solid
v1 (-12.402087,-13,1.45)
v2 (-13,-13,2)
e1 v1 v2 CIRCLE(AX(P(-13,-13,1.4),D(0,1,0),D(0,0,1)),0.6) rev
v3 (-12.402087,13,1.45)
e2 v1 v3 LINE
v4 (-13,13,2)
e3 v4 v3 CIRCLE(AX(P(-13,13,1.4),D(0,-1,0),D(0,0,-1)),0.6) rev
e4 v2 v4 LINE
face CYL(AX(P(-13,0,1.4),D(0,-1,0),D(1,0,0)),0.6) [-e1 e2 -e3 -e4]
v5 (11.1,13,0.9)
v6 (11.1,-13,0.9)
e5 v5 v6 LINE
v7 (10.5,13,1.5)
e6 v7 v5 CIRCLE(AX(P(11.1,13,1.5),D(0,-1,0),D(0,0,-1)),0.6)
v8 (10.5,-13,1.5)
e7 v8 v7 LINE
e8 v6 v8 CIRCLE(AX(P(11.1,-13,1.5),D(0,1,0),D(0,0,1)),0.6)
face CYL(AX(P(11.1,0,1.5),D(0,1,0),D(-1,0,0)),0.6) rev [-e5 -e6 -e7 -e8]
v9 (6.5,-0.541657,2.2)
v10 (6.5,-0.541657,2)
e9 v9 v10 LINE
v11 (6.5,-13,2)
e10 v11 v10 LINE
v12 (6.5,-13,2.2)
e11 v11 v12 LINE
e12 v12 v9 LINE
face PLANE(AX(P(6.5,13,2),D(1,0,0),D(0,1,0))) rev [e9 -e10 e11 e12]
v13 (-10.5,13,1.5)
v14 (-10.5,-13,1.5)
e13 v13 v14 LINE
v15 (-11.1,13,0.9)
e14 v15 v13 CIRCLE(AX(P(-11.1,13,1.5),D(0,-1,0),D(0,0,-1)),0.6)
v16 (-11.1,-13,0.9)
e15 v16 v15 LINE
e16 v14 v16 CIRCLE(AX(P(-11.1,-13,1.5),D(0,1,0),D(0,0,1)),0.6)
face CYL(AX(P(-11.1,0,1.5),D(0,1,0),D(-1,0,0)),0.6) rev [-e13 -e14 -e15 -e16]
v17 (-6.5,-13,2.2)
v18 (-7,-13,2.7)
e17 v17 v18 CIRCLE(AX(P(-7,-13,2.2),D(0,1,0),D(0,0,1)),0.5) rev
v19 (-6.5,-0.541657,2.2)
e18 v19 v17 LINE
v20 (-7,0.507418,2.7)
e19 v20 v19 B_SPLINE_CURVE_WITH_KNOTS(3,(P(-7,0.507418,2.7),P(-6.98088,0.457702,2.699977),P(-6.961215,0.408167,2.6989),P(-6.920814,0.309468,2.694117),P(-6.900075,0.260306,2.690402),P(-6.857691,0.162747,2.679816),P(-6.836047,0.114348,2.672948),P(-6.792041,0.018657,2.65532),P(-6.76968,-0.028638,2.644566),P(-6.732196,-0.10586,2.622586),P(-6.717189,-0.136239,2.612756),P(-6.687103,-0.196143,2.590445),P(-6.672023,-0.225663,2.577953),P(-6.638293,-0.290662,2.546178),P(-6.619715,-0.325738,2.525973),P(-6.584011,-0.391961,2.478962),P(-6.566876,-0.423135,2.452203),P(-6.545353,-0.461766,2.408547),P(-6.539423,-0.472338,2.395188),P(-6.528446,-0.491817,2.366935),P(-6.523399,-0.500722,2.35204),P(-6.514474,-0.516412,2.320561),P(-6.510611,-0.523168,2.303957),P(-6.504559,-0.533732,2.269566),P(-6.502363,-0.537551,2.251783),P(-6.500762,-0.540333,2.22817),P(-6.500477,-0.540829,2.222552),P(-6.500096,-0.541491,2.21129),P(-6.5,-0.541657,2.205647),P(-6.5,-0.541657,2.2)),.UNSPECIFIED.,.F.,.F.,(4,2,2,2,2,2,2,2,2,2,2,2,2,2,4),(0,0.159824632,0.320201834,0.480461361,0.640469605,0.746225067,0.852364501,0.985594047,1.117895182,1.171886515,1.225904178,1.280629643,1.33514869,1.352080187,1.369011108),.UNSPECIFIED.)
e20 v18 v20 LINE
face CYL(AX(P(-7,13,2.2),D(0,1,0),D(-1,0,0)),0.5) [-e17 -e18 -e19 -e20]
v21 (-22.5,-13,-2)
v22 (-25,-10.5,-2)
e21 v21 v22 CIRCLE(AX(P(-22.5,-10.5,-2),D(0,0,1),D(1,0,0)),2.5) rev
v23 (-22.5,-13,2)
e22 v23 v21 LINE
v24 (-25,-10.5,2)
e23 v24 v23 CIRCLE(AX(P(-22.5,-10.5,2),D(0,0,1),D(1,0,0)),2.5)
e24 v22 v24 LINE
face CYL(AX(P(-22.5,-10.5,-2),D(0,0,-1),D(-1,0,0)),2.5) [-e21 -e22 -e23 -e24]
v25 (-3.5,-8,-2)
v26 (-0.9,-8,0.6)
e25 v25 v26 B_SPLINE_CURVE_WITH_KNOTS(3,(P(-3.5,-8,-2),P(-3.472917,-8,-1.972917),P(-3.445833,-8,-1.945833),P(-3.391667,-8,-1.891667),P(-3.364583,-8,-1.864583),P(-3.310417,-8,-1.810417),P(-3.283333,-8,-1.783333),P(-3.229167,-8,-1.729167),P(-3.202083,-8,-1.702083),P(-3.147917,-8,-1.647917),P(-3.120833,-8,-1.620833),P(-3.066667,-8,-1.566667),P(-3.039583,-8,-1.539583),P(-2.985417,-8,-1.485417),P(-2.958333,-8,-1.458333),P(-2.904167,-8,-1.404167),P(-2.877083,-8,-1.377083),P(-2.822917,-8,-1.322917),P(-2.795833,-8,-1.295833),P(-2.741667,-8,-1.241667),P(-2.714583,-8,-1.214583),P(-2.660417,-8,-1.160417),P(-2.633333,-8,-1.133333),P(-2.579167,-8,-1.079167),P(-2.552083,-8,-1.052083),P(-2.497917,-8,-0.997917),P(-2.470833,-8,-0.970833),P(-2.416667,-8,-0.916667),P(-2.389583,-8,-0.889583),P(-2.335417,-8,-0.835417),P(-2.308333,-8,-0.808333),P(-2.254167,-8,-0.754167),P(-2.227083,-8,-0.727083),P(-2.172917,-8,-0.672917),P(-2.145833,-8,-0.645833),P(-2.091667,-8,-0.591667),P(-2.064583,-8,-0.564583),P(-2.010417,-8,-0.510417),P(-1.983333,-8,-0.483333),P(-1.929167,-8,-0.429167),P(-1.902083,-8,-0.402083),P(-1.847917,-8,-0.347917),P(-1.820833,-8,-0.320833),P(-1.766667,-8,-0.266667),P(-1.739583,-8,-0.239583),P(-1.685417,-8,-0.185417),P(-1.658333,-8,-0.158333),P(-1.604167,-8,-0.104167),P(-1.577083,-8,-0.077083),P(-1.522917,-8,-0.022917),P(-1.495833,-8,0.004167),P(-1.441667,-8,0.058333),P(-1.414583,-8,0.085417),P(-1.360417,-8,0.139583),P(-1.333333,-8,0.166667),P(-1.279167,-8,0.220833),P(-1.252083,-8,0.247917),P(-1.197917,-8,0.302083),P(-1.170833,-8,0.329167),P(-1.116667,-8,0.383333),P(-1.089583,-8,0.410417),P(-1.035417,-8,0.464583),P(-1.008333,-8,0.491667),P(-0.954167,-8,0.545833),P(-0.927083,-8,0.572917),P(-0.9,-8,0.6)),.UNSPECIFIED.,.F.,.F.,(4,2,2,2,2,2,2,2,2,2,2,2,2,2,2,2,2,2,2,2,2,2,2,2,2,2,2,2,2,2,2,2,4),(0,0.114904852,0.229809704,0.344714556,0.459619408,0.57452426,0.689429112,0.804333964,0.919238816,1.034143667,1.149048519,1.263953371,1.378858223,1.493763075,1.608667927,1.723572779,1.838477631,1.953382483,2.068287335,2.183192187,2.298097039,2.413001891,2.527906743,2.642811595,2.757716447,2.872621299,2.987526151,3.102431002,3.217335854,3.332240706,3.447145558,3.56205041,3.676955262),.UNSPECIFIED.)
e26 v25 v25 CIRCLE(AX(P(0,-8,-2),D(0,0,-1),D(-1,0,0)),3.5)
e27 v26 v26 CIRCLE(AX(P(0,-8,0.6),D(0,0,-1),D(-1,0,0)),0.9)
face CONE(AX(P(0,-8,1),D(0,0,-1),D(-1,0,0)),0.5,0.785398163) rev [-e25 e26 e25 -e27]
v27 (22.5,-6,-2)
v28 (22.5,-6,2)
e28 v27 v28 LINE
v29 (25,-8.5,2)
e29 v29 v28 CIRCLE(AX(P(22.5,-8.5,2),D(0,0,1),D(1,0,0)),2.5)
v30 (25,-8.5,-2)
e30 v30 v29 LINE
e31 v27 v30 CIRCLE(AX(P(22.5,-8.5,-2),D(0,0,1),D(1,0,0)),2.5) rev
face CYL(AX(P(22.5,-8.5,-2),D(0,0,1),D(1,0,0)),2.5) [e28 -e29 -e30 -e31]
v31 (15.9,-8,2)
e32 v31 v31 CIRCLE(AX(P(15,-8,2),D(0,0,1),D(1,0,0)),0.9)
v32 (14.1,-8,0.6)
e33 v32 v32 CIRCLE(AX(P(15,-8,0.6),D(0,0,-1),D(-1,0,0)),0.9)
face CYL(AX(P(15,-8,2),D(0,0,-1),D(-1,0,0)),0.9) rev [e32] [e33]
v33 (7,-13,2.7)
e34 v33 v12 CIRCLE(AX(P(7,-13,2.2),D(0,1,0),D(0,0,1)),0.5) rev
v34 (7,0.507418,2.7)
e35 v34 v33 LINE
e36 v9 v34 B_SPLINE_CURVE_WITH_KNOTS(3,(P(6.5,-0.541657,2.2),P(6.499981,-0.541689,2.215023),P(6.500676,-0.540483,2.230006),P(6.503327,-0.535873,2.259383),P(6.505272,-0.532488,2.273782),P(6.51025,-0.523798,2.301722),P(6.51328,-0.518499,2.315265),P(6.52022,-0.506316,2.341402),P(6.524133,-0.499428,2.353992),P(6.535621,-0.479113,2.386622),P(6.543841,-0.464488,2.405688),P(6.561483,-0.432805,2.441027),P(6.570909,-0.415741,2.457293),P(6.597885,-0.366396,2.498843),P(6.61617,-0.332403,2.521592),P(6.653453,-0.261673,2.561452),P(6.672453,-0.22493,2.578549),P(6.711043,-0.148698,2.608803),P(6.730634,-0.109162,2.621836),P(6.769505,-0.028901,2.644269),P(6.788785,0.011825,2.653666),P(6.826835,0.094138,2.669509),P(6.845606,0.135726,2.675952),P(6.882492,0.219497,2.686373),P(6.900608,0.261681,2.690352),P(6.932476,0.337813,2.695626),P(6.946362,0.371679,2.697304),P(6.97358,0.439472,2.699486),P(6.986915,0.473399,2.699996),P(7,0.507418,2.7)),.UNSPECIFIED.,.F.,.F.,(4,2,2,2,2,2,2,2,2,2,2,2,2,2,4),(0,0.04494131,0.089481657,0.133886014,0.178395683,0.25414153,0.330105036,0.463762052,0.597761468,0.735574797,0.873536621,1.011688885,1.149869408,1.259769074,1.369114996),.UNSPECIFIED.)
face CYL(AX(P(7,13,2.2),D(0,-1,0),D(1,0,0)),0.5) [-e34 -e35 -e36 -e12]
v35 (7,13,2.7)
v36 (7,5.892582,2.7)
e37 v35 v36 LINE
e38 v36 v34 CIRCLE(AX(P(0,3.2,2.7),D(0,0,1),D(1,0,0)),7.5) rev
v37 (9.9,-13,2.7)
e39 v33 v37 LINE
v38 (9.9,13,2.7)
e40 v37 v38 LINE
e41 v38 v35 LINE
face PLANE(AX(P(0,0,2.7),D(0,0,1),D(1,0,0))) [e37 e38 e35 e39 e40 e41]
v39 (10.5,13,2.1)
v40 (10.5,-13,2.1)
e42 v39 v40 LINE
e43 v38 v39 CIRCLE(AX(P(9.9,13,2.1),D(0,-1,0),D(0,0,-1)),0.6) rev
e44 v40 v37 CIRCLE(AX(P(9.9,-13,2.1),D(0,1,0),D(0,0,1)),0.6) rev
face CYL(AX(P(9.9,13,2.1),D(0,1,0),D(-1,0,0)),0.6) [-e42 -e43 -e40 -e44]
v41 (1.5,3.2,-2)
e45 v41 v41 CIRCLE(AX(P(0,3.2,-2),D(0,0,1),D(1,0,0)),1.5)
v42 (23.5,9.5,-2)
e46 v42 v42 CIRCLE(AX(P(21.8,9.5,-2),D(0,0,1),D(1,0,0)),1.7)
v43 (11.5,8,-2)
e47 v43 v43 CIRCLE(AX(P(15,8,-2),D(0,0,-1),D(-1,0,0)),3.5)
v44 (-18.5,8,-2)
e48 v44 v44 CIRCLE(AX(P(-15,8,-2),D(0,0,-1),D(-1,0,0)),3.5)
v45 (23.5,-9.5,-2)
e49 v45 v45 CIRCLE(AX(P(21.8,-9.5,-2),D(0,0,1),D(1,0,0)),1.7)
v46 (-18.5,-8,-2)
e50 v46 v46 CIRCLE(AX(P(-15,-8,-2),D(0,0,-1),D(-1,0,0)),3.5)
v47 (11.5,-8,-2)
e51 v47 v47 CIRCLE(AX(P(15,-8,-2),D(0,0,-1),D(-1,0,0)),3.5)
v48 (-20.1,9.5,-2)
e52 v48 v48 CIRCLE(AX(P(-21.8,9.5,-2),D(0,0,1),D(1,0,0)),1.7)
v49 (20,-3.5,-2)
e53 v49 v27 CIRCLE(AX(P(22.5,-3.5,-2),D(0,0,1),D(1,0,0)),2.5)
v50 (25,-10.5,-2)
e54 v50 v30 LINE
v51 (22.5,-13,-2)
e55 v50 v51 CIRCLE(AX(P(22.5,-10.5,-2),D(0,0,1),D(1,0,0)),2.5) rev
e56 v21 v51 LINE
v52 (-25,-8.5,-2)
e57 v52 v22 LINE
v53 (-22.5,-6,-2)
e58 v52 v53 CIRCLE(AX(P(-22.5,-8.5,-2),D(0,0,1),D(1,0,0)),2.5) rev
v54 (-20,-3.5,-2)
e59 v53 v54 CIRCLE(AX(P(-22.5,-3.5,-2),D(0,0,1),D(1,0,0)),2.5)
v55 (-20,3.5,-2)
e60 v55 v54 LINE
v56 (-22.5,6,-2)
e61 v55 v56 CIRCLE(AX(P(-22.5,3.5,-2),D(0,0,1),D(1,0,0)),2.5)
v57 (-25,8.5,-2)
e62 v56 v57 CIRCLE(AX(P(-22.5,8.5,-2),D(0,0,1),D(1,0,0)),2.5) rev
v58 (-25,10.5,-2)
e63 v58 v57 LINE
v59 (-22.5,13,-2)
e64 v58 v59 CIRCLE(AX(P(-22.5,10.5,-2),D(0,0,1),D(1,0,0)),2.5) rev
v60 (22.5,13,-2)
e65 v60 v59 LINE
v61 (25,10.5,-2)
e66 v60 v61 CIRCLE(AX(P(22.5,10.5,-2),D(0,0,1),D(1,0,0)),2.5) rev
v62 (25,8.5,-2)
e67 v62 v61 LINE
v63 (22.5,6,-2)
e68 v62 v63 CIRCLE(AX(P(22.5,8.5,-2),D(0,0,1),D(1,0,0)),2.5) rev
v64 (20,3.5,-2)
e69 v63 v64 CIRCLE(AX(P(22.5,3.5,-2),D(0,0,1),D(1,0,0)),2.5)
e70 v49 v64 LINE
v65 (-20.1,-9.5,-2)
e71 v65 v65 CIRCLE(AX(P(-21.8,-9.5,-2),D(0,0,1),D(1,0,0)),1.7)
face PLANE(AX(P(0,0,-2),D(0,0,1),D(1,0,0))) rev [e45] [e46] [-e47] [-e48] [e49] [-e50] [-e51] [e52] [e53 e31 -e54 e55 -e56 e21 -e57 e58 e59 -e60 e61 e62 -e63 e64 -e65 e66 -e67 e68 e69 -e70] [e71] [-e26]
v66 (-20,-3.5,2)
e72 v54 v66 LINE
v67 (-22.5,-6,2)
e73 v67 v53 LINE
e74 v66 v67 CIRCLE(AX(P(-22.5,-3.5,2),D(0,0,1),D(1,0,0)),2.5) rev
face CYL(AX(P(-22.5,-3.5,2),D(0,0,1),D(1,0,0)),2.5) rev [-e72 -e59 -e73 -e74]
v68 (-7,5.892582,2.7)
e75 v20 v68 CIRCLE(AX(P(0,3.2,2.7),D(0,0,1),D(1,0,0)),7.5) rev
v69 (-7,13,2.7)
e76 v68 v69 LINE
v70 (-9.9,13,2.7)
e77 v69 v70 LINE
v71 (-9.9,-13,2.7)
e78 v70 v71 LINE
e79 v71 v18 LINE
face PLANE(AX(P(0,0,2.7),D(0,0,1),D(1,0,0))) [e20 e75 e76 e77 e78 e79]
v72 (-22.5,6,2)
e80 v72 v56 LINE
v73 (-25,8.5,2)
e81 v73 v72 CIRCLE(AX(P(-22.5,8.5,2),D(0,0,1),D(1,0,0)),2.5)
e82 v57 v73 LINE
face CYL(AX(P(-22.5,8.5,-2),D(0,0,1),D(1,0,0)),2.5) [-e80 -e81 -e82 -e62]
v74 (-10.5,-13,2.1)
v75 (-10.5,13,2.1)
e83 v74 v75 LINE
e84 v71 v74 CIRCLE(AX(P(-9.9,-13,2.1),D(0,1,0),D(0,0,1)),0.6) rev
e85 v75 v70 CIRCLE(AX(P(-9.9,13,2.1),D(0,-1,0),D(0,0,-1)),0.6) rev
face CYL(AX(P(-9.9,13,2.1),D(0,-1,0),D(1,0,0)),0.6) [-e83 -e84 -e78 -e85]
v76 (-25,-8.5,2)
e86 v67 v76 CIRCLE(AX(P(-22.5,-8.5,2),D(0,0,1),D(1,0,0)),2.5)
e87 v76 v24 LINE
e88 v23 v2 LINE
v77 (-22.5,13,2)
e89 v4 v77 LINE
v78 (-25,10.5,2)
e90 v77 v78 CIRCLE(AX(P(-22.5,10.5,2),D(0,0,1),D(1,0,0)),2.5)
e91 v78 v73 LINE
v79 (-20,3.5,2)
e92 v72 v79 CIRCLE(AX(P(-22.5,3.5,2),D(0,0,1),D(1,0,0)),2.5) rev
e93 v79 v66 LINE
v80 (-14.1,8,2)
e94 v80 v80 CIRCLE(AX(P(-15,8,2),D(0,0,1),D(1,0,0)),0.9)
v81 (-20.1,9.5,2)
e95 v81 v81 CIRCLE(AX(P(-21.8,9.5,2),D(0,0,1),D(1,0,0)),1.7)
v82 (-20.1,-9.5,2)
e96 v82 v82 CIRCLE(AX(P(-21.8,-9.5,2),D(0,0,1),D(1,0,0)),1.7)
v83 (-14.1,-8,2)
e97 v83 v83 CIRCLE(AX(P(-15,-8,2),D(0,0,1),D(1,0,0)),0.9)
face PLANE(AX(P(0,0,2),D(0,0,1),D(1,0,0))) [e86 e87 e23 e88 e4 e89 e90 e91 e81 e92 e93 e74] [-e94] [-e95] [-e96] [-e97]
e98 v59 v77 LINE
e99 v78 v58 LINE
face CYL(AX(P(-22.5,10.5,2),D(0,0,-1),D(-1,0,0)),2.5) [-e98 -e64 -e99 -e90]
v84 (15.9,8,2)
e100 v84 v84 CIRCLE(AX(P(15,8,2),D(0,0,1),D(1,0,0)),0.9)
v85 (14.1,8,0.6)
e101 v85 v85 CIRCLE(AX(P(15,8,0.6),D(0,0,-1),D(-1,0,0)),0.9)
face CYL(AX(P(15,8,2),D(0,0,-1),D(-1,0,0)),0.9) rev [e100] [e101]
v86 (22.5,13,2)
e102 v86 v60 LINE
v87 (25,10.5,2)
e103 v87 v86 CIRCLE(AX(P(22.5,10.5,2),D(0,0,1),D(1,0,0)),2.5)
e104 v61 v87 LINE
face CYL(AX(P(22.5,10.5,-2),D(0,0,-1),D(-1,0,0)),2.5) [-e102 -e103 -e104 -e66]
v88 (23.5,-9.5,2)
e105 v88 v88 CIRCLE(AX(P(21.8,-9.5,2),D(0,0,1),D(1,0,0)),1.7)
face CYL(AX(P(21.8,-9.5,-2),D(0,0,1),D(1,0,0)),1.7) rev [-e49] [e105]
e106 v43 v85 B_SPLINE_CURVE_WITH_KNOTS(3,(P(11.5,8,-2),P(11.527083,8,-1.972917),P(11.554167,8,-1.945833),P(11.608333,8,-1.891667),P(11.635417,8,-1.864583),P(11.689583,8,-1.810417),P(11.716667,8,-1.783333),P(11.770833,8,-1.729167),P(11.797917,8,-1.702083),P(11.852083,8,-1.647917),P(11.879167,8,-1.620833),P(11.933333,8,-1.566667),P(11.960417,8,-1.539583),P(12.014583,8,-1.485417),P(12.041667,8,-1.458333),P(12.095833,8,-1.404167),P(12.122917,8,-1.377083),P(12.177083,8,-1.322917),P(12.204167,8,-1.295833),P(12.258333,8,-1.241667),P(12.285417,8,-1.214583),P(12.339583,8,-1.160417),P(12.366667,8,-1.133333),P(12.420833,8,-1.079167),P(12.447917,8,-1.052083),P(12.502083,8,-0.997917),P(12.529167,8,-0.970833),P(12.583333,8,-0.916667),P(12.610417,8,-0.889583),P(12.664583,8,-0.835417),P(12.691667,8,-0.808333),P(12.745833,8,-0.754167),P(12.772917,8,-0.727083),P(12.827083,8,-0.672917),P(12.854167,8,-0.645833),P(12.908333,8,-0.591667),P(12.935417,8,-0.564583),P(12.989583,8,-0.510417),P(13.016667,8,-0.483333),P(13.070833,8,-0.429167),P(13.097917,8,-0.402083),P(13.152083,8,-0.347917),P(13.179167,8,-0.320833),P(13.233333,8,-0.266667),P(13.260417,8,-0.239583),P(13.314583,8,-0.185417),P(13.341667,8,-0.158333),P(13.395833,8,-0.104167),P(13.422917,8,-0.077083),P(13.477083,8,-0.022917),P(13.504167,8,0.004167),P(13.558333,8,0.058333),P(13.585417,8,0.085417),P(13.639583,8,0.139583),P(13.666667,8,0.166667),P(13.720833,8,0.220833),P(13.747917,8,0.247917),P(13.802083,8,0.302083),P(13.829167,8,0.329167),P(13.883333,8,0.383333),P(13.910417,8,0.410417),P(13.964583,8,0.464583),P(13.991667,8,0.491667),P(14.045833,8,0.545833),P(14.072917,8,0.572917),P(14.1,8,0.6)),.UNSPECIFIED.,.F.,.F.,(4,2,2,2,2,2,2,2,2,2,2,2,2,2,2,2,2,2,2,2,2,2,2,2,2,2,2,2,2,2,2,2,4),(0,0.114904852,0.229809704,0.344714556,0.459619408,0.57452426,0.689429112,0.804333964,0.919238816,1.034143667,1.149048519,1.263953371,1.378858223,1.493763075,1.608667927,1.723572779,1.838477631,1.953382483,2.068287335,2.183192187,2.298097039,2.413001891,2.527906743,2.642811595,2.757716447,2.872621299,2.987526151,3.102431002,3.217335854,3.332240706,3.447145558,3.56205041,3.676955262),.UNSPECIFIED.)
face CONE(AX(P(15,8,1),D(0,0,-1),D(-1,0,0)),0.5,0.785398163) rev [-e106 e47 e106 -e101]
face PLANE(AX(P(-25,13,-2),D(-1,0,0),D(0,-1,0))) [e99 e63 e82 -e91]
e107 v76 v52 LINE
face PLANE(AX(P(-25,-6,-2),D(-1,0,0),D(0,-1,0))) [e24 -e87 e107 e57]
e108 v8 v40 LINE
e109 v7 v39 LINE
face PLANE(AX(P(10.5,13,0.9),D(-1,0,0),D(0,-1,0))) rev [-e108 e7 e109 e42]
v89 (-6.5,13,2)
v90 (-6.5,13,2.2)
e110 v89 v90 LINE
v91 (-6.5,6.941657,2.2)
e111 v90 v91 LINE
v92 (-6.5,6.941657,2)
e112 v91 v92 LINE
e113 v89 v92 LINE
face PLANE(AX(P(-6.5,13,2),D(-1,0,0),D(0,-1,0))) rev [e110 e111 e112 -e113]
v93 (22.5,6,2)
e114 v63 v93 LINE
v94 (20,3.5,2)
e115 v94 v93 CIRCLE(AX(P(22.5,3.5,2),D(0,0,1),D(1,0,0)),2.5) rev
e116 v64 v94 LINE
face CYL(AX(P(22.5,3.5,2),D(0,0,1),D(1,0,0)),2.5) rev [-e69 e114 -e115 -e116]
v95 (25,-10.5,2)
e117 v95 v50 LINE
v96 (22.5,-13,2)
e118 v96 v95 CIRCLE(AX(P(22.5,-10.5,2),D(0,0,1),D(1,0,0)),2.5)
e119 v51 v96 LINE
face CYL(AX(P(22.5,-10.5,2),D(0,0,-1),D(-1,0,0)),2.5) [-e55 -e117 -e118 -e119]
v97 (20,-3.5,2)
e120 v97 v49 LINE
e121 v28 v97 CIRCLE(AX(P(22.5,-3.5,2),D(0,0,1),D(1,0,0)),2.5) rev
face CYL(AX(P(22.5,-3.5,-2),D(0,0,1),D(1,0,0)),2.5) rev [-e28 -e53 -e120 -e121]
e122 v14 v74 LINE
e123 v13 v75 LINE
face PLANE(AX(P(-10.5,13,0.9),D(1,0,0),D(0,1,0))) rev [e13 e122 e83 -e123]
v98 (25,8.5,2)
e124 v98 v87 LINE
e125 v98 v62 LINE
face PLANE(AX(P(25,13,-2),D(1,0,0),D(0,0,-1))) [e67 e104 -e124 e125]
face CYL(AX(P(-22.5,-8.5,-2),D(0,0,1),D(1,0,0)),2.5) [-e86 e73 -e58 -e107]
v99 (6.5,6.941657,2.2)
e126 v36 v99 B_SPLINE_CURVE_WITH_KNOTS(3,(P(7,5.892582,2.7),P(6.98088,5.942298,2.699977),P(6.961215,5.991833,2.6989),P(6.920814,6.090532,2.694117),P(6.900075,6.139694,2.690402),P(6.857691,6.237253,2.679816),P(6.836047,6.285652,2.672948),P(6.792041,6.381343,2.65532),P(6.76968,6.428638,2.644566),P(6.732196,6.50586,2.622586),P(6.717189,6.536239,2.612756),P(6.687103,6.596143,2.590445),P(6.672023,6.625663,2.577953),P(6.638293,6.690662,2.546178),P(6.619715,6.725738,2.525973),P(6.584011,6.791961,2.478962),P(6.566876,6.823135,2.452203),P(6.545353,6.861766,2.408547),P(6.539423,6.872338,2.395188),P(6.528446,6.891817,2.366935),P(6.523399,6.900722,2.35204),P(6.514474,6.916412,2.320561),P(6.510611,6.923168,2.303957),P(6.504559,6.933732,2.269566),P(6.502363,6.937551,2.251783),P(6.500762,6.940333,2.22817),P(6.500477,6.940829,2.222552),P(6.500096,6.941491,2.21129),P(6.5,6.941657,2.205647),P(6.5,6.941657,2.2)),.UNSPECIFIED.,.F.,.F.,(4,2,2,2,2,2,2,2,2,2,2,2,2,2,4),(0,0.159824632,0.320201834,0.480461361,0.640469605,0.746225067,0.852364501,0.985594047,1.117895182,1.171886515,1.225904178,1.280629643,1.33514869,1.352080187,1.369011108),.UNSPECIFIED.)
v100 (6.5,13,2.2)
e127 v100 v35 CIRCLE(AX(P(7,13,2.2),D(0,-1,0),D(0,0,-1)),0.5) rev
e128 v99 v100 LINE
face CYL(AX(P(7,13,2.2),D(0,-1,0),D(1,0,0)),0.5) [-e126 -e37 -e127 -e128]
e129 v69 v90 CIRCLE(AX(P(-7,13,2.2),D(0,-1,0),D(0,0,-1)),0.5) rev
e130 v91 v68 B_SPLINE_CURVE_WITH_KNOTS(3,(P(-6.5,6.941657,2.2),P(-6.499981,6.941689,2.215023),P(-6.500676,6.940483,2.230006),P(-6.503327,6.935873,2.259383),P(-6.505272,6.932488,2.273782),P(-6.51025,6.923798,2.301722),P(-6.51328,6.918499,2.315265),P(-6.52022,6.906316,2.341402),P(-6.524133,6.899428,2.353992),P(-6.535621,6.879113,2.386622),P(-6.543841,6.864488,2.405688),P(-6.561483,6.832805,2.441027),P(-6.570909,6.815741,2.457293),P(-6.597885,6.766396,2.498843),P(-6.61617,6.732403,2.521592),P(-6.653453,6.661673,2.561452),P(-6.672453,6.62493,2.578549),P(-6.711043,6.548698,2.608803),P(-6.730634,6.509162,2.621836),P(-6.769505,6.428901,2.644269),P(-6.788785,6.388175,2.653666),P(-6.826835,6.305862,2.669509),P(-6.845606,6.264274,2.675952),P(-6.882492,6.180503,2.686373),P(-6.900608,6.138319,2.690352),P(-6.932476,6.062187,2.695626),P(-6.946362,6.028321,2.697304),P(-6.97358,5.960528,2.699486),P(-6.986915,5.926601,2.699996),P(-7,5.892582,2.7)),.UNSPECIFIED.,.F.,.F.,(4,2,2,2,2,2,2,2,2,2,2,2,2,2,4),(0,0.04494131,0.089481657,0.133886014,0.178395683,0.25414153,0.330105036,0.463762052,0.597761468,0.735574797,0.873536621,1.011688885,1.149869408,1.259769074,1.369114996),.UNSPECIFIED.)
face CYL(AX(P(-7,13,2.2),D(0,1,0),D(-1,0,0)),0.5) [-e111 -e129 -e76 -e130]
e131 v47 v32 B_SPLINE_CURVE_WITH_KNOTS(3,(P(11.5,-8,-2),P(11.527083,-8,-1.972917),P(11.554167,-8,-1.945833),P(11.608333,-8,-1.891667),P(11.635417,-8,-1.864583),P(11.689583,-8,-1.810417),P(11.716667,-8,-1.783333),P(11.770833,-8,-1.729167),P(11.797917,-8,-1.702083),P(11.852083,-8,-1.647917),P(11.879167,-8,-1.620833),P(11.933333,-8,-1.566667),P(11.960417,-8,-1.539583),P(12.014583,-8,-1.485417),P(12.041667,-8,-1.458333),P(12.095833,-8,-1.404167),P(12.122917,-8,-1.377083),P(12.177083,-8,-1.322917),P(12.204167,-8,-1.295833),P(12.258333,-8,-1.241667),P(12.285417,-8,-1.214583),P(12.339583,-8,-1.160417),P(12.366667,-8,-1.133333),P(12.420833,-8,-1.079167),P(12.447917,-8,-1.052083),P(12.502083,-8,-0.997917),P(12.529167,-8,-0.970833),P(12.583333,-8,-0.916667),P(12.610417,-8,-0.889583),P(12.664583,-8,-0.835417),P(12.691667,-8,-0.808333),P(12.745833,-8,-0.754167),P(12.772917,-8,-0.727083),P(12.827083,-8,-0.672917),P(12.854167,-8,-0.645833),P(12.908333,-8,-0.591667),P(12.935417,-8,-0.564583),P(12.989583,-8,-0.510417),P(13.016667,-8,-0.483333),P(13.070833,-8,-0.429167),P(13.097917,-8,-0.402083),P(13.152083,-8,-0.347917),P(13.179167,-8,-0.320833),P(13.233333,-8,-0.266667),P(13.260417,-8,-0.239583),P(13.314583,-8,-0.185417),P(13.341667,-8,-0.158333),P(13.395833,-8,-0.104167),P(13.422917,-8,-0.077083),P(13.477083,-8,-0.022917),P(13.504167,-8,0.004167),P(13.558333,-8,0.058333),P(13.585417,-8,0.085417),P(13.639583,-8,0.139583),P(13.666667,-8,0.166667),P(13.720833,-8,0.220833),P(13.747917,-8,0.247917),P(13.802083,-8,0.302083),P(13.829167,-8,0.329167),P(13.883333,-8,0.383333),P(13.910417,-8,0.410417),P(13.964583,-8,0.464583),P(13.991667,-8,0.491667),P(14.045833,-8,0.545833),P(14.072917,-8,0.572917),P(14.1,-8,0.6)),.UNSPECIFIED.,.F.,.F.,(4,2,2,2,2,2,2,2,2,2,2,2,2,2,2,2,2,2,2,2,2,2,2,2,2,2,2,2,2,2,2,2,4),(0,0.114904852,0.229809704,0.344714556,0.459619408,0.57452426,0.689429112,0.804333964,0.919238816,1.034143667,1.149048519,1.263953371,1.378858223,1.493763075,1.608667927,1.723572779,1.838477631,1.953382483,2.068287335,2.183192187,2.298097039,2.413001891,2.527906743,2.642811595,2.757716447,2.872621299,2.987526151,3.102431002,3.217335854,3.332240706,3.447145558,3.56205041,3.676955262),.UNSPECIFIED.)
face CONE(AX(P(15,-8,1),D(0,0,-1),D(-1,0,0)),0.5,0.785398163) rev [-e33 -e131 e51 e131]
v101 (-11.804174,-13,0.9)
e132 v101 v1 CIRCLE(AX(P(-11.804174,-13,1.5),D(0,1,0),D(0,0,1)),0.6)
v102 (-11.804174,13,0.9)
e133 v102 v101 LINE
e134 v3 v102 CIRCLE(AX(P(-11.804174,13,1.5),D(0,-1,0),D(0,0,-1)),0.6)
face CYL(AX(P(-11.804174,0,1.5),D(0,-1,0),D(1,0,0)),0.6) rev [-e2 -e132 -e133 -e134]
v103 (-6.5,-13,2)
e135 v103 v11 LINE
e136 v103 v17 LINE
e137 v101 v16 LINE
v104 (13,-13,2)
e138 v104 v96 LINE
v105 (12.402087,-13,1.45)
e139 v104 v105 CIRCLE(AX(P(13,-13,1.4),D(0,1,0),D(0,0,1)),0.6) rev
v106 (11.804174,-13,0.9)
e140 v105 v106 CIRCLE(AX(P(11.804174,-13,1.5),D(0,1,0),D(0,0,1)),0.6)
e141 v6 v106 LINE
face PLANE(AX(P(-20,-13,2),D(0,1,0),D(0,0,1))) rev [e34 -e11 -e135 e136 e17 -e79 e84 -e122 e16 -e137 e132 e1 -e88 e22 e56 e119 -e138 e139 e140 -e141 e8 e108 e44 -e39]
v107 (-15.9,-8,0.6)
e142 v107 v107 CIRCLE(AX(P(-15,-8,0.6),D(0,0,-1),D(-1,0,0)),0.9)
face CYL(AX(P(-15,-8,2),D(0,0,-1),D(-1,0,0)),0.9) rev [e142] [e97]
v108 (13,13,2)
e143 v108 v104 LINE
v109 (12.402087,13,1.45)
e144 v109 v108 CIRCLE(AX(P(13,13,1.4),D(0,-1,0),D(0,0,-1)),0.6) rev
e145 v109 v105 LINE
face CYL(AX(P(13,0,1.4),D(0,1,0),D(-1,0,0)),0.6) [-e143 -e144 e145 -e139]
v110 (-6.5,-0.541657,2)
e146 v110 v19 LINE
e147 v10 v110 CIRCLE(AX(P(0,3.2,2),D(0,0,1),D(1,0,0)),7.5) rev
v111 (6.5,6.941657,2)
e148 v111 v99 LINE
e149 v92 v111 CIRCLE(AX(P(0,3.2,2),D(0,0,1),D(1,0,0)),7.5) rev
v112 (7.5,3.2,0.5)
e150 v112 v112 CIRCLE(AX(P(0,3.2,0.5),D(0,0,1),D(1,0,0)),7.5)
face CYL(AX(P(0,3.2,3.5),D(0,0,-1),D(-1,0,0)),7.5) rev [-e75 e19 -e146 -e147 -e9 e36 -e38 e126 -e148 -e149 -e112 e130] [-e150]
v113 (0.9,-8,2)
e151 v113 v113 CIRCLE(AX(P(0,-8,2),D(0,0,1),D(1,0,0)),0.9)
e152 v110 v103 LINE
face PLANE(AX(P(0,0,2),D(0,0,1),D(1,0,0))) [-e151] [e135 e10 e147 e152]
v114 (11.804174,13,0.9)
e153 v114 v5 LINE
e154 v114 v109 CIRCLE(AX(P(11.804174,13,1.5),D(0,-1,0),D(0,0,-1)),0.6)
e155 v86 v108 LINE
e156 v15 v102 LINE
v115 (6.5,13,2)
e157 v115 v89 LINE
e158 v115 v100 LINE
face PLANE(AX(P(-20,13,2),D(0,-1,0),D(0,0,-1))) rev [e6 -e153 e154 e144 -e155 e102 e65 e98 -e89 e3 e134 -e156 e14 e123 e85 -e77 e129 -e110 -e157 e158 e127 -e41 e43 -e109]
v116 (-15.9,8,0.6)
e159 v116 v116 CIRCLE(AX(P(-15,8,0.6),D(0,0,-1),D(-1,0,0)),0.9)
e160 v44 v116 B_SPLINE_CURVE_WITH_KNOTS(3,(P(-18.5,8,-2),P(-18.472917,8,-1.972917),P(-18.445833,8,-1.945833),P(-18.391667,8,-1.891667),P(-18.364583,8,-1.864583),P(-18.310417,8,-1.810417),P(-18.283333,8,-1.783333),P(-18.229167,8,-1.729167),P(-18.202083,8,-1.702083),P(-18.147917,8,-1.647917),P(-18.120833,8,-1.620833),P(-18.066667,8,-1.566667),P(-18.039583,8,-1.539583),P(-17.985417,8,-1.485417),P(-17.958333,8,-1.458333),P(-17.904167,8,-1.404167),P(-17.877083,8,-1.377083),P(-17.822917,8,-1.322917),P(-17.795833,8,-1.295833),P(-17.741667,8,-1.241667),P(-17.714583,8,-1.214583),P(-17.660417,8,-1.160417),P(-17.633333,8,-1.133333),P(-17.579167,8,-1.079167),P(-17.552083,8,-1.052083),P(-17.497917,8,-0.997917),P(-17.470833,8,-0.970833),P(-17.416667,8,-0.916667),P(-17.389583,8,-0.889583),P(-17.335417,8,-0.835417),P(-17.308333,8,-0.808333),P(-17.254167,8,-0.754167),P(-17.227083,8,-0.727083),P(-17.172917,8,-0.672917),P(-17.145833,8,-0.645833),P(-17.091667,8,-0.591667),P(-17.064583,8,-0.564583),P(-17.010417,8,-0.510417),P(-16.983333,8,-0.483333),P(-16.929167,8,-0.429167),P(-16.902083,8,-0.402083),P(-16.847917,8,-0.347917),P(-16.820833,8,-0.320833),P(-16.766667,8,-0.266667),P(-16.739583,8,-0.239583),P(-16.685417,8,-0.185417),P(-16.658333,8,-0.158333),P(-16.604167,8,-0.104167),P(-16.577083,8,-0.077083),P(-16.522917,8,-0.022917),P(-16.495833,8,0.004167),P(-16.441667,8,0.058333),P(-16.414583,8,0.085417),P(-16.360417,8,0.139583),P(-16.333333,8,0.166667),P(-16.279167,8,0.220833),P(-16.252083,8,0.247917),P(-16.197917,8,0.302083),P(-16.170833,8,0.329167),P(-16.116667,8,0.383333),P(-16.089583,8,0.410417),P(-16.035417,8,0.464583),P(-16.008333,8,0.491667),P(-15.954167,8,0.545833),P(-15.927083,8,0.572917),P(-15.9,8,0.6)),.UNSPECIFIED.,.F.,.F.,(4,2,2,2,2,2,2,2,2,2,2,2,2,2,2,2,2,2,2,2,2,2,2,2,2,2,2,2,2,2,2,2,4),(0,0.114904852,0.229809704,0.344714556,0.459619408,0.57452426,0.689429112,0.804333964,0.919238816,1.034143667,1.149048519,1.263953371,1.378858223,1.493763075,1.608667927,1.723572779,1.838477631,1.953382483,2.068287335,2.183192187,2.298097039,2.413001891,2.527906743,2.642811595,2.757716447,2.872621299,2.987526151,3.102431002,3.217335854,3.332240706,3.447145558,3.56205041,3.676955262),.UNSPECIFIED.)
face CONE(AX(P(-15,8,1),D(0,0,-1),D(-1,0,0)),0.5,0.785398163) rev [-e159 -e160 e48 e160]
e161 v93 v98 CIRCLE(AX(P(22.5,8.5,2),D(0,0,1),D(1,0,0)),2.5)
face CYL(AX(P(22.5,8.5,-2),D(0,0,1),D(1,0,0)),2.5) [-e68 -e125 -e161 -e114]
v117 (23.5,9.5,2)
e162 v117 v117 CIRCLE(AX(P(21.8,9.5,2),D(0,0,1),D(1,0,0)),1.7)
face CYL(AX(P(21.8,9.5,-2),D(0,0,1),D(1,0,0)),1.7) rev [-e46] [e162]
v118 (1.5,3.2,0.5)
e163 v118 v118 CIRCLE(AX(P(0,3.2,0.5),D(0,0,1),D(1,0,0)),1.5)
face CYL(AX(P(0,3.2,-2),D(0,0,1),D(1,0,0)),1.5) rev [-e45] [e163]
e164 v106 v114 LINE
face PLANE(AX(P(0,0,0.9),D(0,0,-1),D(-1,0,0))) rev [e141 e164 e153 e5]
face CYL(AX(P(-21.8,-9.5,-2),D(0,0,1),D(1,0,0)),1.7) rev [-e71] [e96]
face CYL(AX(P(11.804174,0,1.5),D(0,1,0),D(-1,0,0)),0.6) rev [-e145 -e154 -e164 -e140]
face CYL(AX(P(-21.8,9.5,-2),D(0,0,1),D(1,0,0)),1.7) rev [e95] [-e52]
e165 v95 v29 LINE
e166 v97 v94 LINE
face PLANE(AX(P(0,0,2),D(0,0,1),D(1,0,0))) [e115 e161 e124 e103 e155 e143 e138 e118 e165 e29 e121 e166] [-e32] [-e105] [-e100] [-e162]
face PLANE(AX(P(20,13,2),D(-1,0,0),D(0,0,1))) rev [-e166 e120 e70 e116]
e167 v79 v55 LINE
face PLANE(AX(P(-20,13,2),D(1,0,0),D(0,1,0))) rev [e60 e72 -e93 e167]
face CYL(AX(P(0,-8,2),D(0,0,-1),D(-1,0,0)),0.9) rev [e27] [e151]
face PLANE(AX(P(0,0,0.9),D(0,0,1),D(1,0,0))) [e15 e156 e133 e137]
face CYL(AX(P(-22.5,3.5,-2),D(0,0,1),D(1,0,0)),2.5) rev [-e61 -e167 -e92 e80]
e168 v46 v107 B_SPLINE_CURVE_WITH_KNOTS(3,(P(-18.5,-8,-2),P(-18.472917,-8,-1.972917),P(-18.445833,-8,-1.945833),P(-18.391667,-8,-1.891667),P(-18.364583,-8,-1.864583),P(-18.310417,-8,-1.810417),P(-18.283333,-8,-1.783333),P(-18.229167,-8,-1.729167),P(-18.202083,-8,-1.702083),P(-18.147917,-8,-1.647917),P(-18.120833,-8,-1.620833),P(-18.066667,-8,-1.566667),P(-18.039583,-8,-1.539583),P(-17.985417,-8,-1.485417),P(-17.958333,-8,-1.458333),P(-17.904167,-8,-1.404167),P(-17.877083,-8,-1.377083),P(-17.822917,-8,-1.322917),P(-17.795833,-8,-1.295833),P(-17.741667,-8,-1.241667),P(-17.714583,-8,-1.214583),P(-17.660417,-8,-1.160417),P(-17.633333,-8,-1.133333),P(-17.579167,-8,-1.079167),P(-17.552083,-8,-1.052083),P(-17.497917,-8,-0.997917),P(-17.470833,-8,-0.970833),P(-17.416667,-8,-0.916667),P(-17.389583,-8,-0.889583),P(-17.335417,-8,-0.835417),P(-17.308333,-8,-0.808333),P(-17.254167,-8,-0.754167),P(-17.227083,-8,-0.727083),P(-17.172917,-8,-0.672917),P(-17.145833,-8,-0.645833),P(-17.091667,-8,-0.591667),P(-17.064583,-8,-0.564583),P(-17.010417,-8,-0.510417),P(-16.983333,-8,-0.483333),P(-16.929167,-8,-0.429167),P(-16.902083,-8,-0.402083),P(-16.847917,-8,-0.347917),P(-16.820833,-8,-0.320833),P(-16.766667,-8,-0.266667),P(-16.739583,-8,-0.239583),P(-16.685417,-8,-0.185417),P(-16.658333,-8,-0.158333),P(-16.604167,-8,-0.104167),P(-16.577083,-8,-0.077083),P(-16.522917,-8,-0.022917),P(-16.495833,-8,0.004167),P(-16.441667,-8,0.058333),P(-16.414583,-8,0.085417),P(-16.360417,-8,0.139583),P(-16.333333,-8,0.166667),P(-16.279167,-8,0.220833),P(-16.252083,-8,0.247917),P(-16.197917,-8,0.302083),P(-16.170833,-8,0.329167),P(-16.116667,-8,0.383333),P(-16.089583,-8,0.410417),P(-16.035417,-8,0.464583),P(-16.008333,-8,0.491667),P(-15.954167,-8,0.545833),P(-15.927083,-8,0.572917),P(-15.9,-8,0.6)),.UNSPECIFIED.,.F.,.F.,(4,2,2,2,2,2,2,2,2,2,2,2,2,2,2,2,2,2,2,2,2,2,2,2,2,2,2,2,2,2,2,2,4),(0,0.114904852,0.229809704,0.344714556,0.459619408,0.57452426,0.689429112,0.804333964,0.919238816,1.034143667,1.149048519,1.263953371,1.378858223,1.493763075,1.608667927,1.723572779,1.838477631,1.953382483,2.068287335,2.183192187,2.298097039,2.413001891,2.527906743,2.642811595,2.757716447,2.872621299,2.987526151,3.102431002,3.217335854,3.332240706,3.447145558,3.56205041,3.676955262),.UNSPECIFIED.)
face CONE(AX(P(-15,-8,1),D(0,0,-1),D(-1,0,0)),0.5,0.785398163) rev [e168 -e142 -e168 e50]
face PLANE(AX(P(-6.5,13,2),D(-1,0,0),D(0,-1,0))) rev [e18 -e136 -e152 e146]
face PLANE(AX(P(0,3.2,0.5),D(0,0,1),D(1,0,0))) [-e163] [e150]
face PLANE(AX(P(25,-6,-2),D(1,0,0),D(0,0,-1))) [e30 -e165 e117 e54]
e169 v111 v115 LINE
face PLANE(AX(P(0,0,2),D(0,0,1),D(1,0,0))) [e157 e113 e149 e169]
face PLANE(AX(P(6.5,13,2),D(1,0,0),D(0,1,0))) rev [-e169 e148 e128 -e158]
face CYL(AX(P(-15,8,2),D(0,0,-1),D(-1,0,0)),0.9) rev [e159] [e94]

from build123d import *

# Parameters (mm, degrees)
BODY_S_W                    = 40
BODY_S_H                    = 26
BODY_S_R                    = 0.9
BODY_DEPTH                  = 2
CUTTING_S_R                 = 3.5
CUTTING_DEPTH               = 3
WING_S_W                    = 5
WING_S_H                    = 7
WING_S_R                    = 1.7
WING_DEPTH                  = 4
LINEARES_MUSTER2_COUNT      = 2
LINEARES_MUSTER2_PITCH      = 19
VERRUNDUNG2_R               = 2.5
GLIDES_S_W                  = 9.2
GLIDES_S_H                  = 26
GLIDES_DEPTH                = 0.7
GEAR_H_R                    = 7.5
GEARHOLE_DEPTH              = 1.5
SHAFT_BORE_DEPTH            = 29.460498942
SHAFT_BORE_DEPTH_BACK       = 29.460498942
BORE_S_R                    = 1.5
FASE2_SIZE                  = 3
FASE3_SIZE                  = 3
RAILCUT_W                   = 1.9
RAILCUT_H                   = 26
RAIL_CUT_DEPTH              = 1.8
EDGE_2_W                    = 0.3
EDGE_2_H                    = 26
CUT_EDGE_DEPTH              = 0.7
VERRUNDUNG6_R               = 0.6
VERRUNDUNG7_R               = 0.6
VERRUNDUNG8_R               = 0.6
GLIDE_SPACE_W               = 3
GLIDE_SPACE_H               = 26
GLIDE_SPACE_RACK_SPUR_DEPTH = 0.7
VERRUNDUNG10_R              = 0.5
VERRUNDUNG11_R              = 0.5
VERRUNDUNG12_R              = 0.5


# Some blends are built 0.0001 mm under size
with BuildPart() as part:
    # body-s → body (new, symmetric)
    with BuildSketch(Plane.XY):
        Rectangle(BODY_S_W, BODY_S_H)
        with Locations((-15, 8)):
            Circle(BODY_S_R, mode=Mode.SUBTRACT)
        with Locations((15, 8)):
            Circle(BODY_S_R, mode=Mode.SUBTRACT)
        with Locations((15, -8)):
            Circle(BODY_S_R, mode=Mode.SUBTRACT)
        with Locations((-15, -8)):
            Circle(BODY_S_R, mode=Mode.SUBTRACT)
        with Locations((0, -8)):
            Circle(BODY_S_R, mode=Mode.SUBTRACT)
    extrude(amount=BODY_DEPTH, both=True)

    # cutting-s → cutting (cut)
    with BuildSketch(Plane(origin=(0, 0, -2), x_dir=(-1, 0, 0), z_dir=(0, 0, -1))):
        with Locations((-15, 8)):
            Circle(CUTTING_S_R)
        with Locations((15, 8)):
            Circle(CUTTING_S_R)
        with Locations((15, -8)):
            Circle(CUTTING_S_R)
        with Locations((-15, -8)):
            Circle(CUTTING_S_R)
        with Locations((0, -8)):
            Circle(CUTTING_S_R)
    extrude(amount=-CUTTING_DEPTH, mode=Mode.SUBTRACT)

    # wing-s → wing (add)
    # profile 1 of 2: a face of its own
    with BuildSketch(Plane.XY.offset(2)):
        with Locations((-22.5, 9.5)):
            Rectangle(WING_S_W, WING_S_H)
        with Locations((-21.8, 9.5)):
            Circle(WING_S_R, mode=Mode.SUBTRACT)
    # profile 2 of 2: a face of its own
    with BuildSketch(Plane.XY.offset(2)):
        with Locations((22.5, 9.5)):
            Rectangle(WING_S_W, WING_S_H)
        with Locations((21.8, 9.5)):
            Circle(WING_S_R, mode=Mode.SUBTRACT)
    wing = extrude(amount=-WING_DEPTH)

    # Lineares Muster2: wing ×2
    with Locations(*[(0, -i * LINEARES_MUSTER2_PITCH, 0) for i in range(1, LINEARES_MUSTER2_COUNT)]):
        add(wing)

    # Verrundung2
    verrundung2_edges = [part.edges().sort_by_distance(p)[0] for p in [
        (25, -13, 0),
        (25, -6, 0),
        (-25, -6, 0),
        (-25, -13, 0),
        (-20, -6, 0),
        (-20, 6, 0),
        (-25, 6, 0),
        (-25, 13, 0),
        (25, 13, 0),
        (20, -6, 0),
        (20, 6, 0),
        (25, 6, 0),
    ]]
    fillet(verrundung2_edges, radius=VERRUNDUNG2_R - 0.0001)  # a hair under: the kernel refuses the full size

    # glides-s → glides (add)
    with BuildSketch(Plane.XY.offset(2)):
        with Locations((-8.1, 0)):
            Rectangle(GLIDES_S_W, GLIDES_S_H)
        with Locations((8.1, 0)):
            Rectangle(GLIDES_S_W, GLIDES_S_H)
    extrude(amount=GLIDES_DEPTH)

    # gear-h → gearhole (cut, symmetric)
    with BuildSketch(Plane.XY.offset(2)):
        with Locations(Location((0, 3.2, 0), (0, 0, 117.818139285))):
            Circle(GEAR_H_R)
    extrude(amount=GEARHOLE_DEPTH, both=True, mode=Mode.SUBTRACT)

    # bore-s → Shaft-bore (cut, two sides: drawn at the far end of the back side and taken through both)
    with BuildSketch(Plane.XY.offset(2).offset(-SHAFT_BORE_DEPTH_BACK)):
        with Locations((0, 3.2)):
            Circle(BORE_S_R)
    extrude(amount=SHAFT_BORE_DEPTH + SHAFT_BORE_DEPTH_BACK, mode=Mode.SUBTRACT)

    # Fase2
    # the kernel refuses this chamfer: 3 mm, written as the material it adds along each edge
    with BuildSketch(Plane(origin=(15, 8, 1), x_dir=(-1, 0, 0), z_dir=(0, -1, 0))) as fase2_piece_1_section:
        Polygon((3.5, FASE2_SIZE), (3.5 - FASE2_SIZE, 0), (3.5, 0), align=None)
    fase2_piece_1 = revolve(axis=Axis((15, 8, 1), (0, 0, -1)), mode=Mode.PRIVATE)
    fase2_piece_1 = split(fase2_piece_1, bisect_by=Plane(origin=(17.230122029, 8, -2), z_dir=(0, 0, 1)), keep=Keep.TOP, mode=Mode.PRIVATE)
    fase2_piece_1 = fase2_piece_1 - Plane(origin=(15, 8, -0.669877971), x_dir=(1, 0, 0), z_dir=(0, 0, -1)) * Cylinder(0.9, 14, mode=Mode.PRIVATE)
    add(fase2_piece_1)

    # Fase3
    # the kernel refuses this chamfer: 3 mm, written as the material it adds along each edge
    with BuildSketch(Plane(origin=(-15, -8, 1), x_dir=(-1, 0, 0), z_dir=(0, -1, 0))) as fase3_piece_1_section:
        Polygon((3.5, FASE3_SIZE), (3.5 - FASE3_SIZE, 0), (3.5, 0), align=None)
    fase3_piece_1 = revolve(axis=Axis((-15, -8, 1), (0, 0, -1)), mode=Mode.PRIVATE)
    fase3_piece_1 = split(fase3_piece_1, bisect_by=Plane(origin=(-12.769877971, -8, -2), z_dir=(0, 0, 1)), keep=Keep.TOP, mode=Mode.PRIVATE)
    fase3_piece_1 = fase3_piece_1 - Plane(origin=(-15, -8, -0.669877971), x_dir=(1, 0, 0), z_dir=(0, 0, -1)) * Cylinder(0.9, 14, mode=Mode.PRIVATE)
    add(fase3_piece_1)
    with BuildSketch(Plane(origin=(-15, 8, 1), x_dir=(-1, 0, 0), z_dir=(0, -1, 0))) as fase3_piece_2_section:
        Polygon((3.5, FASE3_SIZE), (3.5 - FASE3_SIZE, 0), (3.5, 0), align=None)
    fase3_piece_2 = revolve(axis=Axis((-15, 8, 1), (0, 0, -1)), mode=Mode.PRIVATE)
    fase3_piece_2 = split(fase3_piece_2, bisect_by=Plane(origin=(-12.769877971, 8, -2), z_dir=(0, 0, 1)), keep=Keep.TOP, mode=Mode.PRIVATE)
    fase3_piece_2 = fase3_piece_2 - Plane(origin=(-15, 8, -0.669877971), x_dir=(1, 0, 0), z_dir=(0, 0, -1)) * Cylinder(0.9, 14, mode=Mode.PRIVATE)
    add(fase3_piece_2)
    with BuildSketch(Plane(origin=(0, -8, 1), x_dir=(-1, 0, 0), z_dir=(0, -1, 0))) as fase3_piece_3_section:
        Polygon((3.5, FASE3_SIZE), (3.5 - FASE3_SIZE, 0), (3.5, 0), align=None)
    fase3_piece_3 = revolve(axis=Axis((0, -8, 1), (0, 0, -1)), mode=Mode.PRIVATE)
    fase3_piece_3 = split(fase3_piece_3, bisect_by=Plane(origin=(2.230122029, -8, -2), z_dir=(0, 0, 1)), keep=Keep.TOP, mode=Mode.PRIVATE)
    fase3_piece_3 = fase3_piece_3 - Plane(origin=(0, -8, -0.669877971), x_dir=(1, 0, 0), z_dir=(0, 0, -1)) * Cylinder(0.9, 14, mode=Mode.PRIVATE)
    add(fase3_piece_3)
    with BuildSketch(Plane(origin=(15, -8, 1), x_dir=(-1, 0, 0), z_dir=(0, -1, 0))) as fase3_piece_4_section:
        Polygon((3.5, FASE3_SIZE), (3.5 - FASE3_SIZE, 0), (3.5, 0), align=None)
    fase3_piece_4 = revolve(axis=Axis((15, -8, 1), (0, 0, -1)), mode=Mode.PRIVATE)
    fase3_piece_4 = split(fase3_piece_4, bisect_by=Plane(origin=(17.230122029, -8, -2), z_dir=(0, 0, 1)), keep=Keep.TOP, mode=Mode.PRIVATE)
    fase3_piece_4 = fase3_piece_4 - Plane(origin=(15, -8, -0.669877971), x_dir=(1, 0, 0), z_dir=(0, 0, -1)) * Cylinder(0.9, 14, mode=Mode.PRIVATE)
    add(fase3_piece_4)

    # railcut → rail-cut (cut)
    with BuildSketch(Plane.XY.offset(2.7)):
        with Locations((-11.45, 0)):
            Rectangle(RAILCUT_W, RAILCUT_H)
        with Locations((11.45, 0)):
            Rectangle(RAILCUT_W, RAILCUT_H)
    extrude(amount=-RAIL_CUT_DEPTH, mode=Mode.SUBTRACT)

    # edge 2 → cut-edge (cut)
    with BuildSketch(Plane.XY.offset(2.7)):
        with Locations((-12.55, 0)):
            Rectangle(EDGE_2_W, EDGE_2_H)
        with Locations((12.55, 0)):
            Rectangle(EDGE_2_W, EDGE_2_H)
    extrude(amount=-CUT_EDGE_DEPTH, mode=Mode.SUBTRACT)

    # Verrundung6
    verrundung6_edges = [part.edges().sort_by_distance(p)[0] for p in [
        (-12.4, 0, 2),
        (12.4, 0, 2),
    ]]
    fillet(verrundung6_edges, radius=VERRUNDUNG6_R)

    # Verrundung7
    verrundung7_edges = [part.edges().sort_by_distance(p)[0] for p in [
        (12.4, 0, 0.9),
        (10.5, 0, 0.9),
        (-12.4, 0, 0.9),
        (-10.5, 0, 0.9),
    ]]
    fillet(verrundung7_edges, radius=VERRUNDUNG7_R)

    # Verrundung8
    verrundung8_edges = [part.edges().sort_by_distance(p)[0] for p in [
        (-10.5, 0, 2.7),
        (10.5, 0, 2.7),
    ]]
    fillet(verrundung8_edges, radius=VERRUNDUNG8_R)

    # glide-space → glide-space-rack-spur (cut)
    with BuildSketch(Plane.XY.offset(2.7)):
        with Locations((-5, 0)):
            Rectangle(GLIDE_SPACE_W, GLIDE_SPACE_H)
        with Locations((5, 0)):
            Rectangle(GLIDE_SPACE_W, GLIDE_SPACE_H)
    extrude(amount=-GLIDE_SPACE_RACK_SPUR_DEPTH, mode=Mode.SUBTRACT)

    # Verrundung10
    verrundung10_edges = [part.edges().sort_by_distance(p)[0] for p in [
        (-6.5, 9.970828693, 2.7),
    ]]
    fillet(verrundung10_edges, radius=VERRUNDUNG10_R)

    # Verrundung11
    verrundung11_edges = [part.edges().sort_by_distance(p)[0] for p in [
        (-6.5, -6.770828693, 2.7),
    ]]
    fillet(verrundung11_edges, radius=VERRUNDUNG11_R)

    # Verrundung12
    verrundung12_edges = [part.edges().sort_by_distance(p)[0] for p in [
        (6.5, 9.970828693, 2.7),
        (6.5, -6.770828693, 2.7),
    ]]
    fillet(verrundung12_edges, radius=VERRUNDUNG12_R)


solid = part.part
